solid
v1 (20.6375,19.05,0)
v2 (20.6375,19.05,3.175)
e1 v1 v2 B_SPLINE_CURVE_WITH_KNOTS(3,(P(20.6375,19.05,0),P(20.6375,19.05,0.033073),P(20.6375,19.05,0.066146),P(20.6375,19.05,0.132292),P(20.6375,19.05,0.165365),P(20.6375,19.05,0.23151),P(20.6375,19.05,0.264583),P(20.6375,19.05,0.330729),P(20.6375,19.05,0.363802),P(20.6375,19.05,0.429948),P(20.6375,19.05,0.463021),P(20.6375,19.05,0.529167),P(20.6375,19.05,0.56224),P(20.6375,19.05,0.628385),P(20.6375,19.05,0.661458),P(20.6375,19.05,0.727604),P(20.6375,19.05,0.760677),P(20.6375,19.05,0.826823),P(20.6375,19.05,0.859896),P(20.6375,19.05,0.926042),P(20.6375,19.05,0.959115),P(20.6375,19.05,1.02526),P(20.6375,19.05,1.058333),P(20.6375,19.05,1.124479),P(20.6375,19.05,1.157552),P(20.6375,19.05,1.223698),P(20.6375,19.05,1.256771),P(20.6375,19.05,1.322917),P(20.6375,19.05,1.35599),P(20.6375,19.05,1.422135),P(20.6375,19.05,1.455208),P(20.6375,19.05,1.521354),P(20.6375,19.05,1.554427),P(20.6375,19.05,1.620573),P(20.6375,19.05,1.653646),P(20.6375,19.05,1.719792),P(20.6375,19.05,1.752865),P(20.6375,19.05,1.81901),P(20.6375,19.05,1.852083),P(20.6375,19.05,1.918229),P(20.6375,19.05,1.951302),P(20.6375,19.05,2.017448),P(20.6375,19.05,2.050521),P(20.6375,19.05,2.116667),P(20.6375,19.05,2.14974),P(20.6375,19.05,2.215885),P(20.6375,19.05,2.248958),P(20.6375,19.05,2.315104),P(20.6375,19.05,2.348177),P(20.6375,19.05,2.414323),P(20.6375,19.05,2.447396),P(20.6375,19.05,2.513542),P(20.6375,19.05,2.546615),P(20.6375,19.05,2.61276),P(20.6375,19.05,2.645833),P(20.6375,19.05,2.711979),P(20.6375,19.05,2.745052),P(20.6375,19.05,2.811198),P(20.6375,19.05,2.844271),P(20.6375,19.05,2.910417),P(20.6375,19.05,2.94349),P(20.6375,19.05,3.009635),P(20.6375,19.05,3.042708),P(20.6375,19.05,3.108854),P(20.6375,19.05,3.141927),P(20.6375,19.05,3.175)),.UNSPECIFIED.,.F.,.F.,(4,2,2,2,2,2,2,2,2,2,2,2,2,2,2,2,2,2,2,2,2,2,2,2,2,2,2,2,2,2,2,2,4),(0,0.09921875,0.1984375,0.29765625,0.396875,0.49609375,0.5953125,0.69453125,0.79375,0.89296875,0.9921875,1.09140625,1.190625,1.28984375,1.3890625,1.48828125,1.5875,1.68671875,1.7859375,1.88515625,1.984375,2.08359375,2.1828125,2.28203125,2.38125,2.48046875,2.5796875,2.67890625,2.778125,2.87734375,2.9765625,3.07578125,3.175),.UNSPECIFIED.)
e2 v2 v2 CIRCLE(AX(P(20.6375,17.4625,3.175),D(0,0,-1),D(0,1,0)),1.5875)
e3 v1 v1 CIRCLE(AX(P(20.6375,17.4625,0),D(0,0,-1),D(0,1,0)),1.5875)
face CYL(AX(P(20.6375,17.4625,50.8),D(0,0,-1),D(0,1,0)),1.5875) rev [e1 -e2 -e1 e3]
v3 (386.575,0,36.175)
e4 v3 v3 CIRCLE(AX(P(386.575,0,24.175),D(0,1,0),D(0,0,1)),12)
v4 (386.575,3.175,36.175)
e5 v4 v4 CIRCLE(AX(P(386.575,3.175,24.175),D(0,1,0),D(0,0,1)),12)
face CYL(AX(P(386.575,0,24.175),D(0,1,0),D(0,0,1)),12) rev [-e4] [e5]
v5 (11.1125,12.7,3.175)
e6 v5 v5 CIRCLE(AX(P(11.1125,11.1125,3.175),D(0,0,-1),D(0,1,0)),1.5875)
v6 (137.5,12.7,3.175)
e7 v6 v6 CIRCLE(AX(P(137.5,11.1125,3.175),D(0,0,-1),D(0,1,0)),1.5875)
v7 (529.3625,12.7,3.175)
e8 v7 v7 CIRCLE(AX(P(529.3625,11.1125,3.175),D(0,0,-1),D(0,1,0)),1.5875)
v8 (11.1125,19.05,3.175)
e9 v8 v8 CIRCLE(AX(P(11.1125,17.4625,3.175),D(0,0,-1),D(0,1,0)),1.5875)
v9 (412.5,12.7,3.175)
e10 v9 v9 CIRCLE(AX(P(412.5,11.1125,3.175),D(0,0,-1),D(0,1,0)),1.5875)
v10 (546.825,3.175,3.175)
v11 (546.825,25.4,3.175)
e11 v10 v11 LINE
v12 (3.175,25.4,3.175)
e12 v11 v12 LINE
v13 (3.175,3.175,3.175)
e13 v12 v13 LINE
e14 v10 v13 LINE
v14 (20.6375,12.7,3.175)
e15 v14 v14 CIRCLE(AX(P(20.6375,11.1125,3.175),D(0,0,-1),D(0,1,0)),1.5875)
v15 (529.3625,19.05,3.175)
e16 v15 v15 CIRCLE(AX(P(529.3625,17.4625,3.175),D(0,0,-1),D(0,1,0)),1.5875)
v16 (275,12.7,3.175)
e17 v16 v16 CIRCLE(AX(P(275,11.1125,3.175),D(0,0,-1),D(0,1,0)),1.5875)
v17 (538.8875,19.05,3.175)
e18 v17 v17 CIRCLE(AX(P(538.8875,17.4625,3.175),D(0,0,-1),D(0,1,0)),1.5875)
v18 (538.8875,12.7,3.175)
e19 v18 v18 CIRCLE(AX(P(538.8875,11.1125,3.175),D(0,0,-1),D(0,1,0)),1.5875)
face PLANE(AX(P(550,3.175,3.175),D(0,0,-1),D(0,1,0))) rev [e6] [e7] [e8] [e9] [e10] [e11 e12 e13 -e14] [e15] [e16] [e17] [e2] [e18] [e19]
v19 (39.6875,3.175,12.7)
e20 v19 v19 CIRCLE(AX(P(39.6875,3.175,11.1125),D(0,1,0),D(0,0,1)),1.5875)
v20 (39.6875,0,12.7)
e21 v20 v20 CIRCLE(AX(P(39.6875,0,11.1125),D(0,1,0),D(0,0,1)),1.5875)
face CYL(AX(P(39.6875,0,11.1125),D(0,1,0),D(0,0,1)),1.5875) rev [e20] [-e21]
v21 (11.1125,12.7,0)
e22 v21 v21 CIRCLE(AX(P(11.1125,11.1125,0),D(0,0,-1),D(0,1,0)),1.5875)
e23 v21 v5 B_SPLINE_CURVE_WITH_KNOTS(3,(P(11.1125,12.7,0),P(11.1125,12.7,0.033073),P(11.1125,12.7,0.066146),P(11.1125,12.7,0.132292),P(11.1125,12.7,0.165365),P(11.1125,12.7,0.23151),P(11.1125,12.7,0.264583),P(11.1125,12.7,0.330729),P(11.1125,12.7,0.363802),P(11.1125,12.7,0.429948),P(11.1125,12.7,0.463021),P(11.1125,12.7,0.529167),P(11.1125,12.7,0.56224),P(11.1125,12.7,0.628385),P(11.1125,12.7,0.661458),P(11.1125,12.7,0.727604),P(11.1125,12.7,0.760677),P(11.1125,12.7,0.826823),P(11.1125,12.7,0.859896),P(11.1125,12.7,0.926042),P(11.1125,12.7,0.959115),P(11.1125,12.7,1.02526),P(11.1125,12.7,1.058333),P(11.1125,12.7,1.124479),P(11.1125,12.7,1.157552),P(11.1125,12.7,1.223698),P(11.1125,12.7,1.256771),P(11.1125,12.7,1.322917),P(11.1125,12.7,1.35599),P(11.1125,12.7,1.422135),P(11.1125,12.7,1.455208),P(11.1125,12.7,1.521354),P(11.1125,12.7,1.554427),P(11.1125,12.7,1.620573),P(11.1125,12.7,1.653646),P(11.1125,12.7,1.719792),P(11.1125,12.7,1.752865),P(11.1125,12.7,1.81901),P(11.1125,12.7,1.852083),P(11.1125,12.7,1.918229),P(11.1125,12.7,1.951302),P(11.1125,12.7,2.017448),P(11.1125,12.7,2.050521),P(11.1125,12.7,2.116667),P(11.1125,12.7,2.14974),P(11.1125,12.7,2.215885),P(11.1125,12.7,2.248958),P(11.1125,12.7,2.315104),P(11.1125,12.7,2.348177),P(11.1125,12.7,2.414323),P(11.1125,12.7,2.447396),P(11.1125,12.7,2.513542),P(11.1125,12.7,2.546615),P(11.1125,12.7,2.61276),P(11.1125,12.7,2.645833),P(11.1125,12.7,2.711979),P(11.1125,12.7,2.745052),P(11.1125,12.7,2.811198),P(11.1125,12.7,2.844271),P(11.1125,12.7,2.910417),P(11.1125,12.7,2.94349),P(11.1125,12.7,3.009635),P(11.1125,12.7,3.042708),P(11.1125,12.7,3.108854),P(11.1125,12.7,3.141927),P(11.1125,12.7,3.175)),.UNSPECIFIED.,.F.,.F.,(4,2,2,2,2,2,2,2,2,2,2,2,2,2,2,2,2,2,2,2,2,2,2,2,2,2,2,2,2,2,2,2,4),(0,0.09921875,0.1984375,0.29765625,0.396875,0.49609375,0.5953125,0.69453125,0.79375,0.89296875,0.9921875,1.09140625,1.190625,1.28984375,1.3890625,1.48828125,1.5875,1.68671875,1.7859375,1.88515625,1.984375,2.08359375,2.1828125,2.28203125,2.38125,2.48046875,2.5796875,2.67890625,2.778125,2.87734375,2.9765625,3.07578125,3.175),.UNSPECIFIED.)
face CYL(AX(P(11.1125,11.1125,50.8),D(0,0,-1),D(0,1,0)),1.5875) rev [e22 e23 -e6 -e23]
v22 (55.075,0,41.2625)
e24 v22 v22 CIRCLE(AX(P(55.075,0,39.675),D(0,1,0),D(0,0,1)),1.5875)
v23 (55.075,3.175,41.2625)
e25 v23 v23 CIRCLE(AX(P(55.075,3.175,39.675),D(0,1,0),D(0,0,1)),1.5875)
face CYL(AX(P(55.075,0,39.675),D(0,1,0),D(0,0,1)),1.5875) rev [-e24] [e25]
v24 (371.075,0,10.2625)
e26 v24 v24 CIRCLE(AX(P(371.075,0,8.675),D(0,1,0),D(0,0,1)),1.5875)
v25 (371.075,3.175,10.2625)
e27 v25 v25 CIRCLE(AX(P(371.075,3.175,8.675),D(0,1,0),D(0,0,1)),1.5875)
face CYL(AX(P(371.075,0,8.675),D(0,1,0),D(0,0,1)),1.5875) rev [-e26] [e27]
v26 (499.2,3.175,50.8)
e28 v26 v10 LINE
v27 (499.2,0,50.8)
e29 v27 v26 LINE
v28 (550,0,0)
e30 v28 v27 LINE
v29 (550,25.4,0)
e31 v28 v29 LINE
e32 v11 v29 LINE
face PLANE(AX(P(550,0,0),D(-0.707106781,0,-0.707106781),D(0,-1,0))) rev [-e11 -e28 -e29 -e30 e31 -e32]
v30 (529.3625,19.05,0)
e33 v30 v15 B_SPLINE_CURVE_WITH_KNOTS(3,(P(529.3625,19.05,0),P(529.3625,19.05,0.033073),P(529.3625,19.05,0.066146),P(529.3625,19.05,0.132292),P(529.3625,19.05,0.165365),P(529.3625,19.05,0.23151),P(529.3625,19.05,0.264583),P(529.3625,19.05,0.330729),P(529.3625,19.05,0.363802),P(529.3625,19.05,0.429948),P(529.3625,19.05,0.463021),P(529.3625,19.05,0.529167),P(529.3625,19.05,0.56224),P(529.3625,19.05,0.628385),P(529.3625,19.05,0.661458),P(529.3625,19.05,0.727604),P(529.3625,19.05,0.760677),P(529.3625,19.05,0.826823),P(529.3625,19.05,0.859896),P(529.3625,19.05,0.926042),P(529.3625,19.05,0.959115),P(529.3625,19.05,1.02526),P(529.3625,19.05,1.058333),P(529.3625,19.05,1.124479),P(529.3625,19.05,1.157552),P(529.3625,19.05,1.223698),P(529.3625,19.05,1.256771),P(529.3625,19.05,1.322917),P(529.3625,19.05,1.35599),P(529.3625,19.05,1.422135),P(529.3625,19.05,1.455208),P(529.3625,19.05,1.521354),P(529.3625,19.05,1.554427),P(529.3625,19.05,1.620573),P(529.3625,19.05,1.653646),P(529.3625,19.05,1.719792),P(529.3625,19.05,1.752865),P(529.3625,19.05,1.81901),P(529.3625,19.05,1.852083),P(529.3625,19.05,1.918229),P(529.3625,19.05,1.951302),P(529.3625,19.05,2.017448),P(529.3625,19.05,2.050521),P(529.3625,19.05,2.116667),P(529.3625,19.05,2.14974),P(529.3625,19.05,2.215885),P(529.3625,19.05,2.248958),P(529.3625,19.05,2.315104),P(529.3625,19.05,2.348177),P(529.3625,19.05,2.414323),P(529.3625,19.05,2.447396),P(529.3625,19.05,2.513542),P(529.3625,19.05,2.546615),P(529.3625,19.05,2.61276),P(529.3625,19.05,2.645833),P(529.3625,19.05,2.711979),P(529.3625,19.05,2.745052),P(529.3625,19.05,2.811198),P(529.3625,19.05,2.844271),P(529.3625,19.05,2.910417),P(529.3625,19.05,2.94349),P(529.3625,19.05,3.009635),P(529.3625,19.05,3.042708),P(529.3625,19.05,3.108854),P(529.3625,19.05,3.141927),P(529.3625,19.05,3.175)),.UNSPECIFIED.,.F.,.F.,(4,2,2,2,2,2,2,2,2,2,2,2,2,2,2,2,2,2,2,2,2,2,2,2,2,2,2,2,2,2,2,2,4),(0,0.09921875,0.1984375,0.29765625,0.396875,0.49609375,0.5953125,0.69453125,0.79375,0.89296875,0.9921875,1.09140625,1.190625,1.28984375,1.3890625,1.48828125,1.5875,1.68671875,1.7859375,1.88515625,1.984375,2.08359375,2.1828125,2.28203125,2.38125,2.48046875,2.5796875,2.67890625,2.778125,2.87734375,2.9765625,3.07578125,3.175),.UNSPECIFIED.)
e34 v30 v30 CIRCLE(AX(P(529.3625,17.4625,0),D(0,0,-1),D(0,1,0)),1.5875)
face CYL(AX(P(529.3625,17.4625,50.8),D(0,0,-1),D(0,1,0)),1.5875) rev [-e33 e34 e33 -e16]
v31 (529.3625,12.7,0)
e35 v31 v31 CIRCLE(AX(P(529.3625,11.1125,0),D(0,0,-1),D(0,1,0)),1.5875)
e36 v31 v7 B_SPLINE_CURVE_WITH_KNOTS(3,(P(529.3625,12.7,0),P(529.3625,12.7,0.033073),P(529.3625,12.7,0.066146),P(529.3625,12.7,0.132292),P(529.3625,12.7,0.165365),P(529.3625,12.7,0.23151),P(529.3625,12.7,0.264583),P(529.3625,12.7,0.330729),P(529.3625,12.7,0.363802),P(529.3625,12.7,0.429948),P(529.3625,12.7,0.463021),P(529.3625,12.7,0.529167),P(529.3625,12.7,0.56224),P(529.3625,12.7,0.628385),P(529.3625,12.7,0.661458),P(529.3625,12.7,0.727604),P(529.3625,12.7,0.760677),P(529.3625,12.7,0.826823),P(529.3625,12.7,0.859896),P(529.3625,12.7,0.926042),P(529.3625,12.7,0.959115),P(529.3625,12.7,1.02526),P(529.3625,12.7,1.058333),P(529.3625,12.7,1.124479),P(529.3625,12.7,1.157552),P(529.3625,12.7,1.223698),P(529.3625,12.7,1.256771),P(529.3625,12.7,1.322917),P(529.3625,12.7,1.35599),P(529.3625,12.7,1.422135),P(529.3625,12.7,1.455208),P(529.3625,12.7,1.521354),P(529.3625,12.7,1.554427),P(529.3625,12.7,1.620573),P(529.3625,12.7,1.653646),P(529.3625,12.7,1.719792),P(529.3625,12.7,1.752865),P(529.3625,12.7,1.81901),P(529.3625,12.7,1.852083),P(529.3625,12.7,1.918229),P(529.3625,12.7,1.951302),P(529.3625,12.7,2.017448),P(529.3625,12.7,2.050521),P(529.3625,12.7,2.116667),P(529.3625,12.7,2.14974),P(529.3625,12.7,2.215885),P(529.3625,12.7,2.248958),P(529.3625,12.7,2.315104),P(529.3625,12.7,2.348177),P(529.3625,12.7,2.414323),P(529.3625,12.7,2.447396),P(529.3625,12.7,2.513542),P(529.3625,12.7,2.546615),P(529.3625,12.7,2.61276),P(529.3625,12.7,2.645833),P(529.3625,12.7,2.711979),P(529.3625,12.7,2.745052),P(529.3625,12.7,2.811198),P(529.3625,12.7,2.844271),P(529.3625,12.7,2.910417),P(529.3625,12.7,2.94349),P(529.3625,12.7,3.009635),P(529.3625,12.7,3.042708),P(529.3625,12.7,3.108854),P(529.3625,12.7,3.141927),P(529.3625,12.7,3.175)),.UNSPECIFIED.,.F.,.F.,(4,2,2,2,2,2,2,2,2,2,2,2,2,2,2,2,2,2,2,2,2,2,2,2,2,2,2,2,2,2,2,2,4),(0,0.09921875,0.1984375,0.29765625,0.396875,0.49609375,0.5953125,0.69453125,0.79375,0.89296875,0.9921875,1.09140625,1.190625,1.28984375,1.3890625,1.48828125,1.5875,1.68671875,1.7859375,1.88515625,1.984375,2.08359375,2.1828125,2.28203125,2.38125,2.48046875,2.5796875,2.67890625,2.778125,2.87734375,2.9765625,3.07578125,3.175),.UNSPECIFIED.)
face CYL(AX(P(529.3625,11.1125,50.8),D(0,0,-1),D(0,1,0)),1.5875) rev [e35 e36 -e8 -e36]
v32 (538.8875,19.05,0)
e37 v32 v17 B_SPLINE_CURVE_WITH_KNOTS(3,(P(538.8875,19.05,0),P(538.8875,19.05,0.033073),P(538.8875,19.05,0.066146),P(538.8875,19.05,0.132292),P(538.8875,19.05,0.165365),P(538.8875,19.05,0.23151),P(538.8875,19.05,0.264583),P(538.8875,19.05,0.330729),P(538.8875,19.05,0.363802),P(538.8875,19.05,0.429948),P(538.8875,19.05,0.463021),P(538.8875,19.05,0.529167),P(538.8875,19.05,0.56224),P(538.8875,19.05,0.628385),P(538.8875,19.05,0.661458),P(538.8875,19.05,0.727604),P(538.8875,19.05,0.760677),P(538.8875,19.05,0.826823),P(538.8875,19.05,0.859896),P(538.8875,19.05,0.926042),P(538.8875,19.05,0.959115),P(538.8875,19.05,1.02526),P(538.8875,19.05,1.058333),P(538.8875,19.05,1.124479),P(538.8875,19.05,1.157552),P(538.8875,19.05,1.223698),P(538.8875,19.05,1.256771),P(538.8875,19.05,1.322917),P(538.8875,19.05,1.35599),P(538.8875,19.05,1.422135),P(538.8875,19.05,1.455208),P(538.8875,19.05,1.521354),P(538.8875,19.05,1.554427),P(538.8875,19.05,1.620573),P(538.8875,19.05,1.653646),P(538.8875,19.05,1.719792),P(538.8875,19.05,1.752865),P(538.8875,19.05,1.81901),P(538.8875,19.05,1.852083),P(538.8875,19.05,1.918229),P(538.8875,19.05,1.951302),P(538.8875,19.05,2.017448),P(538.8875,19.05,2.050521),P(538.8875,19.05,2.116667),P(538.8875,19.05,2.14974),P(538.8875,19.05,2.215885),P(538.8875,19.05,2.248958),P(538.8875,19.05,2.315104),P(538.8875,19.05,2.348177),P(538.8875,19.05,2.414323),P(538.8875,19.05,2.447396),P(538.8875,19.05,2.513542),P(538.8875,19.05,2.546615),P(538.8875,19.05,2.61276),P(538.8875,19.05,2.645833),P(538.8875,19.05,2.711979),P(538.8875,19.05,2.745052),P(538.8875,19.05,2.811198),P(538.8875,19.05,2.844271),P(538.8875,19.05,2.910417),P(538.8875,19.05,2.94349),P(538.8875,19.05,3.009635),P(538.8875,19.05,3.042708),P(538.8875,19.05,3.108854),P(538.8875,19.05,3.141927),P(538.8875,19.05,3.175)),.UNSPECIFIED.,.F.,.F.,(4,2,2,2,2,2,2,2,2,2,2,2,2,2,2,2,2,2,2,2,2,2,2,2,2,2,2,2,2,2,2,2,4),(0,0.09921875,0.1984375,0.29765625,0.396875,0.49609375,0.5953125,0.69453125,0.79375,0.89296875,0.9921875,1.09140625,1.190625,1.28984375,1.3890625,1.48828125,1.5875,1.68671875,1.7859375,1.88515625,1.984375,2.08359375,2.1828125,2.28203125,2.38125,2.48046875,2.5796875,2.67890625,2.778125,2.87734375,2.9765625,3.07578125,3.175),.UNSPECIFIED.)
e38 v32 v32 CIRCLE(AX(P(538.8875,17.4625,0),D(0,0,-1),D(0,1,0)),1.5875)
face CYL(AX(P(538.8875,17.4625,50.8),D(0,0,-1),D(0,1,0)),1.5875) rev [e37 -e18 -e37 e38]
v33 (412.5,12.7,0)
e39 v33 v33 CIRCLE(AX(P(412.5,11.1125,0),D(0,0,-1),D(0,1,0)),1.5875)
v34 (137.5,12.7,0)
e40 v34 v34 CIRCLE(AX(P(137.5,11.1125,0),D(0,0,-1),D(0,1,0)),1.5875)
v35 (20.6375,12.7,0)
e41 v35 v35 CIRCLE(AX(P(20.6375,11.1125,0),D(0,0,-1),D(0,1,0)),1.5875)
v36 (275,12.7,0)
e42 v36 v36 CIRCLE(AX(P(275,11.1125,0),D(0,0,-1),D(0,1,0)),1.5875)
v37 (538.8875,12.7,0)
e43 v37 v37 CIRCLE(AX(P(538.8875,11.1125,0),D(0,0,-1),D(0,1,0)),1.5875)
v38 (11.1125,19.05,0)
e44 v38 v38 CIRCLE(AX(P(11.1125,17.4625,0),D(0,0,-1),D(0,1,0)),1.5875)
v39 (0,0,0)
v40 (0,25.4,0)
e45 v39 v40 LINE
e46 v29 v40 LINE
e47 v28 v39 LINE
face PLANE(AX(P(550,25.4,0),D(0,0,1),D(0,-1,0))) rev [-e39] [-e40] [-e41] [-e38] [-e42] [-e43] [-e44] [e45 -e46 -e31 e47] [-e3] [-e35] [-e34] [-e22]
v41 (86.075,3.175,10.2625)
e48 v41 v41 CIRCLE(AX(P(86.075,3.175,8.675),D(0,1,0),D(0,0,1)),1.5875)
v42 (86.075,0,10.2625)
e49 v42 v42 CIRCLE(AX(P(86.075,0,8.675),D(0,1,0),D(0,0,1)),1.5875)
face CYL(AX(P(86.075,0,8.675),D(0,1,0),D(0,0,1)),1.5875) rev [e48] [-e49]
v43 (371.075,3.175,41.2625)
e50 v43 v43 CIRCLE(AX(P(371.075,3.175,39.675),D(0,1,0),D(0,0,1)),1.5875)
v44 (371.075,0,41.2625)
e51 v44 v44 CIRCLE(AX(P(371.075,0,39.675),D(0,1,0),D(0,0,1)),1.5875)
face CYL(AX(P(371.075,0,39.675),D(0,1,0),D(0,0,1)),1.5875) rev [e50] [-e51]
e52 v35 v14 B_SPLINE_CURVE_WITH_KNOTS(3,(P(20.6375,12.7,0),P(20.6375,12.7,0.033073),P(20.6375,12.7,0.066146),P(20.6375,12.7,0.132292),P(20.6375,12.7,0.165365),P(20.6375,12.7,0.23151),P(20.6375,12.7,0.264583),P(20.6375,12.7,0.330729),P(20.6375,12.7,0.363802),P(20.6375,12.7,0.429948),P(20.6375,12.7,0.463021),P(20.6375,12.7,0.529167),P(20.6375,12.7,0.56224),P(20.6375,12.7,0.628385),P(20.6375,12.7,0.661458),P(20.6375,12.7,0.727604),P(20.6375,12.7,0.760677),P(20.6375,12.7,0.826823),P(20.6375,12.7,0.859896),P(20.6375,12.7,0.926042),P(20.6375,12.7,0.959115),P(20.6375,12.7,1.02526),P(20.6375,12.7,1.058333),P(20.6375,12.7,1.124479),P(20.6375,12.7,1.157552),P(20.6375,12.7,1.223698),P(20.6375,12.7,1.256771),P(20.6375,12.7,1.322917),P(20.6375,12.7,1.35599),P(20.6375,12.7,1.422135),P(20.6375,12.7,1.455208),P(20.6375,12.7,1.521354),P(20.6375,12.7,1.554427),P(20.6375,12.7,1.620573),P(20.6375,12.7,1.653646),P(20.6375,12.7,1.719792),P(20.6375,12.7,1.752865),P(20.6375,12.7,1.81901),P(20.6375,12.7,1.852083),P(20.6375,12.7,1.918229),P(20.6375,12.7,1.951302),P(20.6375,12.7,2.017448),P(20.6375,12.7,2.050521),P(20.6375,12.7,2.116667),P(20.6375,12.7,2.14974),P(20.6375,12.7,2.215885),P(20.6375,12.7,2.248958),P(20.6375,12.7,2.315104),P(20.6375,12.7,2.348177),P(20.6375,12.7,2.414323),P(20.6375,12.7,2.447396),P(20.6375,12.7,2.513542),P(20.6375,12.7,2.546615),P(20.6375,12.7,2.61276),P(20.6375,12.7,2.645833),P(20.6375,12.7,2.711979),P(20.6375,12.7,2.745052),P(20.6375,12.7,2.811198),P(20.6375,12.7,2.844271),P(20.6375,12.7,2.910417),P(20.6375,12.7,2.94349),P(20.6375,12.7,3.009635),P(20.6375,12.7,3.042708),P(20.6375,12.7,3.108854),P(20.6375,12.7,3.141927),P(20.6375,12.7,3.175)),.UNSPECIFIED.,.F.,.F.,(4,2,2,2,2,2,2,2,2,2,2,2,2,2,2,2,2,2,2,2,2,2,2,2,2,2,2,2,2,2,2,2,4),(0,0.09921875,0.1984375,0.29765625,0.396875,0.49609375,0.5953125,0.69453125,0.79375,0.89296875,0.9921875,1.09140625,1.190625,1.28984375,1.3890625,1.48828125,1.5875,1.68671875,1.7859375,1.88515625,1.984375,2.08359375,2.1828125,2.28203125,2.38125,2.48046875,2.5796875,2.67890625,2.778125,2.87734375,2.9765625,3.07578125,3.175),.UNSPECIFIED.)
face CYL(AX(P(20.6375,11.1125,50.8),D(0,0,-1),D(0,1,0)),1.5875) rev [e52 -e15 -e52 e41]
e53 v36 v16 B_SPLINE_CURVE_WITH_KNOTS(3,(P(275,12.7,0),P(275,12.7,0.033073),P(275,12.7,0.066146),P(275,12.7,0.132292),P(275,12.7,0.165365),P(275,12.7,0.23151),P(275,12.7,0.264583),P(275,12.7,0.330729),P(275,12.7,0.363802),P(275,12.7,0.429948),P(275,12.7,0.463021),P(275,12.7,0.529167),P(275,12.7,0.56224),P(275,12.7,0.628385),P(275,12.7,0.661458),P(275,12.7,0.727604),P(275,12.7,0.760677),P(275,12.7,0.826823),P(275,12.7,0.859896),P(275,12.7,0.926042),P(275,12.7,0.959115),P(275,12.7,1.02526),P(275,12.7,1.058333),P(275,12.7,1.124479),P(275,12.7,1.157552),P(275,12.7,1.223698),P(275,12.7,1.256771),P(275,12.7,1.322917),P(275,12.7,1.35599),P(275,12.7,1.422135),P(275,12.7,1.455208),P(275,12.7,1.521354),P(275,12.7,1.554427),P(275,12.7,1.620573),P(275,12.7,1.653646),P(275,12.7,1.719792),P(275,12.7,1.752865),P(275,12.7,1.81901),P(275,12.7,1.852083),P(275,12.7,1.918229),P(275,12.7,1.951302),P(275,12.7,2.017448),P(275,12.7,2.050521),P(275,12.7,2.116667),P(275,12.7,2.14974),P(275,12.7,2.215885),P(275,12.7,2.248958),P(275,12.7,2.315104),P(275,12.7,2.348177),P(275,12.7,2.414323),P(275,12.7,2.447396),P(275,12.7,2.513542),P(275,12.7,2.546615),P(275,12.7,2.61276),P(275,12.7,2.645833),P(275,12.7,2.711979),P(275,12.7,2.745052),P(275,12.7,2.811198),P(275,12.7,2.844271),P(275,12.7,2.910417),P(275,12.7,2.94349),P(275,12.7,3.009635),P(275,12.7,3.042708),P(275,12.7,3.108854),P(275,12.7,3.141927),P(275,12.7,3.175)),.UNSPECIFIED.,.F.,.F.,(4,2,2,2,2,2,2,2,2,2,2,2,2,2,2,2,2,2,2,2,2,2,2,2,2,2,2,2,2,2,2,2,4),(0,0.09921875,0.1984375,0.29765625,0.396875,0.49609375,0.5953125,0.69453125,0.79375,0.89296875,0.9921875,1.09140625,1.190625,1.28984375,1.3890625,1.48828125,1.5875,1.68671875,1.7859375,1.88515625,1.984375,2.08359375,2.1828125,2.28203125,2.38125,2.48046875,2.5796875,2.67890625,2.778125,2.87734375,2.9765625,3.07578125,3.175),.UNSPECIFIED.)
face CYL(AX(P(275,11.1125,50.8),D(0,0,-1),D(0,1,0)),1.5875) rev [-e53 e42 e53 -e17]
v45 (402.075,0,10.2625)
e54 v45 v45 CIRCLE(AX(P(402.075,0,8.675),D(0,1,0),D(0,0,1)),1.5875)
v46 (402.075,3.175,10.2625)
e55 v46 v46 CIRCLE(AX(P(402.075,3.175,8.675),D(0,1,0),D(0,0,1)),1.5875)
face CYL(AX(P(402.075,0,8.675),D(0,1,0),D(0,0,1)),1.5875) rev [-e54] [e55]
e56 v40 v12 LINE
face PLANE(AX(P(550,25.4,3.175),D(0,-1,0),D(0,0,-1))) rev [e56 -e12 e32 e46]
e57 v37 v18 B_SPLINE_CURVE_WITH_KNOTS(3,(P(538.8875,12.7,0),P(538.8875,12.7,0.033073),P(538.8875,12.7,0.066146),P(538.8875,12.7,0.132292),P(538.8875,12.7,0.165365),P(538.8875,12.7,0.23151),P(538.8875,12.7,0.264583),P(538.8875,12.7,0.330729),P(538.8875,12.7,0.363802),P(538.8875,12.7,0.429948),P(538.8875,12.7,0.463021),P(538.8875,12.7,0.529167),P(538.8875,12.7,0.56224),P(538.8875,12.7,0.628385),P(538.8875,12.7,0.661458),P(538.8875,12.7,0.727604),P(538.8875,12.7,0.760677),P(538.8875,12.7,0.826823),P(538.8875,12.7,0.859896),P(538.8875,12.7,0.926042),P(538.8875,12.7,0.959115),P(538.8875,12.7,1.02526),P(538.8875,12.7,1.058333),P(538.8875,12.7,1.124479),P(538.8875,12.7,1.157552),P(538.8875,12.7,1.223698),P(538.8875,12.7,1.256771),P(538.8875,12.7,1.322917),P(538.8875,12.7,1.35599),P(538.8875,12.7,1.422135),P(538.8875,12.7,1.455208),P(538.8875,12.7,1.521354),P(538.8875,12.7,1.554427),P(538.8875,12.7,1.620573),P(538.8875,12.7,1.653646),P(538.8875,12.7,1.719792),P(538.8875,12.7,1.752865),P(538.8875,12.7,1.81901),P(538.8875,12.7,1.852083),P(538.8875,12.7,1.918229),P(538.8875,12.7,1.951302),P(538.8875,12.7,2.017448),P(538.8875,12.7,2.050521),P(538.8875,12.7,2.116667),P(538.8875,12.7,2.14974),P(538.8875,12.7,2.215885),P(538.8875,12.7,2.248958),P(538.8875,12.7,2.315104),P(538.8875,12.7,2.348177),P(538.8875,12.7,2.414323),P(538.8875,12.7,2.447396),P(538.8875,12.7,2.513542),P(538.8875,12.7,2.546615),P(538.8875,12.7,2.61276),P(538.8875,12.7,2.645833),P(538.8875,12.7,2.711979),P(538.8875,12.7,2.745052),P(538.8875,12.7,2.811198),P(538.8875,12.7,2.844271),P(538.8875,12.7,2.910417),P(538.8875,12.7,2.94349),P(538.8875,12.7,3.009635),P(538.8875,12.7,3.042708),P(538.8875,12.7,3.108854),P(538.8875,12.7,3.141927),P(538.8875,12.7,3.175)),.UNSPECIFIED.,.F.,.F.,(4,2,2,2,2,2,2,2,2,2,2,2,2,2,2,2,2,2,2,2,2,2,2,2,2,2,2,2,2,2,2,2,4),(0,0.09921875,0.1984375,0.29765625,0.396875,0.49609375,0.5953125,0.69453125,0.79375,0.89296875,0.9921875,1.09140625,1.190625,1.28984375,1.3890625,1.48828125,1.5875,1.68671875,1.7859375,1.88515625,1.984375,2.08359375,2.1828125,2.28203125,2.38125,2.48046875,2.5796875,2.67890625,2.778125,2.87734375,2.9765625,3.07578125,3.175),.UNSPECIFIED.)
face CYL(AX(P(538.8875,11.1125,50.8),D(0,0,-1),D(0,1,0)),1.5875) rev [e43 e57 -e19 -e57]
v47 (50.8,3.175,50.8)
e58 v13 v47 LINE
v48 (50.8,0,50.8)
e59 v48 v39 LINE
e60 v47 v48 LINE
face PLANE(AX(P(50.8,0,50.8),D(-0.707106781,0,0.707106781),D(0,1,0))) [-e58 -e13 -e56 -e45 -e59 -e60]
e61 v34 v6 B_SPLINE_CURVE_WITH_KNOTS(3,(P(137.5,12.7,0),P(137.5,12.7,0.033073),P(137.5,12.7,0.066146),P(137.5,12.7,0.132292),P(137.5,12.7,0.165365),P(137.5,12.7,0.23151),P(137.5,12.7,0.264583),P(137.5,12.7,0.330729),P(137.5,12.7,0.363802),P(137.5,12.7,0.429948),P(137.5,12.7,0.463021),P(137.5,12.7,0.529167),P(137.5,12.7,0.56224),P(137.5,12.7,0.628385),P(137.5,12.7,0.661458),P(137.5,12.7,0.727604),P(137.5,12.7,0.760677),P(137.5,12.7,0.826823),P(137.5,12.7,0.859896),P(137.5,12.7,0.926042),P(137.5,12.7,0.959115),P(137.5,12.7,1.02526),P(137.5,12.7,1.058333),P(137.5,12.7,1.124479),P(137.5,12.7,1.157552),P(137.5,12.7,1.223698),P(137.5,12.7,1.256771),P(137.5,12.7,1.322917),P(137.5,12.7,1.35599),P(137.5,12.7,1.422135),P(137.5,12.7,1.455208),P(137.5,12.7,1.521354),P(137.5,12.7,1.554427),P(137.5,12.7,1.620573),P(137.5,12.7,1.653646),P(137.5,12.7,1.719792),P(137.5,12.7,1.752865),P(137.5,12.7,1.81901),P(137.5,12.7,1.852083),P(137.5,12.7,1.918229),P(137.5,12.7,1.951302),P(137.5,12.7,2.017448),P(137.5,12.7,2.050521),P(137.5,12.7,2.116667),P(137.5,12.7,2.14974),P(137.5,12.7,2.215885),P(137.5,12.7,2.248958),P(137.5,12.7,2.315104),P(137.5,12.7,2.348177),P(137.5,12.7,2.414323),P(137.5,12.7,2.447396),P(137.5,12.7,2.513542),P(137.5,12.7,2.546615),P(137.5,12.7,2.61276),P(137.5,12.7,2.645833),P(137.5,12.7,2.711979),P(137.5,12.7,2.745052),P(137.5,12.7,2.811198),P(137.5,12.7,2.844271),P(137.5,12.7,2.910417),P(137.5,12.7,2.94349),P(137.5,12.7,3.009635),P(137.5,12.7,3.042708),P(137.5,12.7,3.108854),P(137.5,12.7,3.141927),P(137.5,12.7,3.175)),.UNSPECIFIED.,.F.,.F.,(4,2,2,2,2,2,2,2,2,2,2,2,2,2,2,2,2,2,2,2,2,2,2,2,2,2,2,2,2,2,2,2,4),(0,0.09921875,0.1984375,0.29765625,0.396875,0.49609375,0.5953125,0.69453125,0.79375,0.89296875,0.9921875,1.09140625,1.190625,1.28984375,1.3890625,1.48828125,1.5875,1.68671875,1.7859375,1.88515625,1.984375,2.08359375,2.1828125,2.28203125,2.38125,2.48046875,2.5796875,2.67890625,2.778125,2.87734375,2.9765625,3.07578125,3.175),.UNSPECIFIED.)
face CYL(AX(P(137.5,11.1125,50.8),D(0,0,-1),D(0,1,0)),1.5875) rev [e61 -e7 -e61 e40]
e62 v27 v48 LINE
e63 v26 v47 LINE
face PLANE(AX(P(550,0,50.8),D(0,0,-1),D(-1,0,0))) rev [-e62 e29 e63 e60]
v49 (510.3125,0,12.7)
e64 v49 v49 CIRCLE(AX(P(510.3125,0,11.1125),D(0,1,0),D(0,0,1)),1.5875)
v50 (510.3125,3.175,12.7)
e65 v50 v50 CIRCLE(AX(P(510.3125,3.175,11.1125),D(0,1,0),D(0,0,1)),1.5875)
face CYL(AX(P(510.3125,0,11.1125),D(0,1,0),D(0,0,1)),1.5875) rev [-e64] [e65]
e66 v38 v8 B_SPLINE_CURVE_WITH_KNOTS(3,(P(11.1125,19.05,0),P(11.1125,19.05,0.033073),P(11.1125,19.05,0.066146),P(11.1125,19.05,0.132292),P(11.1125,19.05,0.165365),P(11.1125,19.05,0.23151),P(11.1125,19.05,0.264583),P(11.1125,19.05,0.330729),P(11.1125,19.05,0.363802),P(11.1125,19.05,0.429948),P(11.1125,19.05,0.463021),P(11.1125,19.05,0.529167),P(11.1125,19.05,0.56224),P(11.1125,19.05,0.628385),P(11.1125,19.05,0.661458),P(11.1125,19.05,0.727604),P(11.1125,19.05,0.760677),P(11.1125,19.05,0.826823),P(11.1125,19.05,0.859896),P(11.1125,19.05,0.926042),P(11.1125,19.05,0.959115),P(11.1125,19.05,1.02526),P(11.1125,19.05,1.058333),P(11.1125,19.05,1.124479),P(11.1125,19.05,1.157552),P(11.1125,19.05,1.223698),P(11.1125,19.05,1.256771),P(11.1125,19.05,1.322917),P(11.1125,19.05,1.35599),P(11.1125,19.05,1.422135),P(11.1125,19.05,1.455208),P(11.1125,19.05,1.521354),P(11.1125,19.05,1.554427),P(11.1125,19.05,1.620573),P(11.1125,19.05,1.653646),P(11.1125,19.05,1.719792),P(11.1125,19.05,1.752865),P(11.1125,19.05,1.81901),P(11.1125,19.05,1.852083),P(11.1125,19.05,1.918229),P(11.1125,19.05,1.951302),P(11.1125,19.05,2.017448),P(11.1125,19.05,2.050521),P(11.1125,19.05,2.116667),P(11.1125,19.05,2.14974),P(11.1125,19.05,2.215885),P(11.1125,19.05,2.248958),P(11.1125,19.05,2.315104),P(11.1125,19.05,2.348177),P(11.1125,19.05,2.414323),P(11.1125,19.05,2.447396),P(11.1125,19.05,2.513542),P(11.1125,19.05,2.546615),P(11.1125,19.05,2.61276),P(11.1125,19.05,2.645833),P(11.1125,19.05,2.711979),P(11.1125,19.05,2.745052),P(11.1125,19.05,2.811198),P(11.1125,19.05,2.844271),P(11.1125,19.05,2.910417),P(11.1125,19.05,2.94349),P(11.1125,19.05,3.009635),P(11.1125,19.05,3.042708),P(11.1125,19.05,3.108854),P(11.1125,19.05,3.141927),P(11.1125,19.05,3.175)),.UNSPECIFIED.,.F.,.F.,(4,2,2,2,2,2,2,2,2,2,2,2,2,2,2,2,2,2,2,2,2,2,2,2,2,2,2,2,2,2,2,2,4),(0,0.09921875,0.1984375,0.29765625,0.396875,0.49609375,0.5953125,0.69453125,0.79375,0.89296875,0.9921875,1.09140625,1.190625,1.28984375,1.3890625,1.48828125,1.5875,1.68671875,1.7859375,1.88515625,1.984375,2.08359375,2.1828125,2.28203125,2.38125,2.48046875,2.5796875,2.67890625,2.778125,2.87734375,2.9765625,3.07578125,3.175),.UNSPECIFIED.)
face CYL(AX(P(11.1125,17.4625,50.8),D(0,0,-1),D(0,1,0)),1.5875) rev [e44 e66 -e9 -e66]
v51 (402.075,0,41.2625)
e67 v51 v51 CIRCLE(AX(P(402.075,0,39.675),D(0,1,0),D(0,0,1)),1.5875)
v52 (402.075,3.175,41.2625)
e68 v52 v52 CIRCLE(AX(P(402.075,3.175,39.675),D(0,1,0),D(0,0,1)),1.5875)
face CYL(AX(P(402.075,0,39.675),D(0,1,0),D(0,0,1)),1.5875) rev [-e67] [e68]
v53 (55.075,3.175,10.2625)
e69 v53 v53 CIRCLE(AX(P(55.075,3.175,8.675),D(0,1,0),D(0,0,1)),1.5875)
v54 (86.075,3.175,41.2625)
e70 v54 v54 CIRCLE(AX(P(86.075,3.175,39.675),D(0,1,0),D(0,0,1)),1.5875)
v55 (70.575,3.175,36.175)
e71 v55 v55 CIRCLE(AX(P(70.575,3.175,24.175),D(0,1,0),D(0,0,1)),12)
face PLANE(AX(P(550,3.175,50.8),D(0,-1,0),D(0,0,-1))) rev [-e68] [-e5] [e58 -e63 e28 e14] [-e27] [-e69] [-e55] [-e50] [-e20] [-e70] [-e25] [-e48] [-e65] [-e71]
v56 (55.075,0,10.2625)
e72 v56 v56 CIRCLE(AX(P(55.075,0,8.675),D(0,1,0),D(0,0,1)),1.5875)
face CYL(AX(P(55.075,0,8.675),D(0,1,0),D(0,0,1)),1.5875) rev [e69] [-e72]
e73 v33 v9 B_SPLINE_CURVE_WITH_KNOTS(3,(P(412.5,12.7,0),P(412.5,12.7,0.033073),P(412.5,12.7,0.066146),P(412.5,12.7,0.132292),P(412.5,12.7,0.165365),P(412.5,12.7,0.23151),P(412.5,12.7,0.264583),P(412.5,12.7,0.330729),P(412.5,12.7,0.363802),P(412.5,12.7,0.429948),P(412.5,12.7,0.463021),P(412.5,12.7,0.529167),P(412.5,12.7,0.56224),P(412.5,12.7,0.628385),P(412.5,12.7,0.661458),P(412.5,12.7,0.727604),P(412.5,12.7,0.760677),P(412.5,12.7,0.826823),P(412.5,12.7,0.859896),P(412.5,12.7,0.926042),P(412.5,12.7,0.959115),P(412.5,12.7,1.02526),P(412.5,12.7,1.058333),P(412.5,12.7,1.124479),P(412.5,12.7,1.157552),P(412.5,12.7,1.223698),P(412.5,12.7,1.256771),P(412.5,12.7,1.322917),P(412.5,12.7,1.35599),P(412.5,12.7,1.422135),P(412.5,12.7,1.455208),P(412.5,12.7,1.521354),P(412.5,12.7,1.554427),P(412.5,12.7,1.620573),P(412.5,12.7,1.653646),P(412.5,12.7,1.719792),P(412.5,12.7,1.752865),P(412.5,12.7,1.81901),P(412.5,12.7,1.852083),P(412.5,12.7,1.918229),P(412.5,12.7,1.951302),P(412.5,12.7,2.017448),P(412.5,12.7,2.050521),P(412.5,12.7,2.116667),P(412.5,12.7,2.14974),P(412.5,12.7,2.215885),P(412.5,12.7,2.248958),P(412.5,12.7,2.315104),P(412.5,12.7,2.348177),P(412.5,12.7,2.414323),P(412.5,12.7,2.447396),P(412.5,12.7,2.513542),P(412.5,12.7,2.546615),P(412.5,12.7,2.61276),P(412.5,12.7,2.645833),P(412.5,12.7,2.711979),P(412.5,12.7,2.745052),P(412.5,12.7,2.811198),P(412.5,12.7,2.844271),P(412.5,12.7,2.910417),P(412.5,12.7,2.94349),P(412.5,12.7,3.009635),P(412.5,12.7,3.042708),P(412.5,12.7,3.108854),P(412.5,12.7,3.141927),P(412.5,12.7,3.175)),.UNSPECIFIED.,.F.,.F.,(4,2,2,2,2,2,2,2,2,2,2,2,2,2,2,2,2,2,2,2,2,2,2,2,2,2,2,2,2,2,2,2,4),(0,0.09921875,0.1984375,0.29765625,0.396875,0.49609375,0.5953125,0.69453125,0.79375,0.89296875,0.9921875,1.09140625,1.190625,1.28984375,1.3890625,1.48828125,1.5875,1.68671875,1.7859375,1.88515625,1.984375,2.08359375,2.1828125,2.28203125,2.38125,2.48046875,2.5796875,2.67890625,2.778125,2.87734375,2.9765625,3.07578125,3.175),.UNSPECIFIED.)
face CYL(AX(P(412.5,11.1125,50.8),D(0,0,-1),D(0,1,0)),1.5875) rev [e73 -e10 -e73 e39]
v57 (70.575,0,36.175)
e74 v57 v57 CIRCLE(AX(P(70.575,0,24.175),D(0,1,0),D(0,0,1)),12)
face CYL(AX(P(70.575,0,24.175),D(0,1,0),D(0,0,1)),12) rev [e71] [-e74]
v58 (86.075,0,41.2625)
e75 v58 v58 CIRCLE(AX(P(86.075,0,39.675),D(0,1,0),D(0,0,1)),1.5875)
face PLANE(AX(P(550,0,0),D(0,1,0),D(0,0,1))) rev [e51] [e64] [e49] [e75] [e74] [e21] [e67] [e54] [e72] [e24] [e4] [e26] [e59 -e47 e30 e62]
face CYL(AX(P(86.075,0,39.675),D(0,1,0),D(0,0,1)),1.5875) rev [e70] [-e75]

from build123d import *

# Parameters (mm, degrees)
BOSS_EXTRUDE1_DEPTH              = 550
CHAMFER7_SIZE                    = 50.8
CHAMFER8_SIZE                    = 50.8
BOTTHOMHOLES_SKETCH2_R           = 12
BOTTHOMHOLES_SKETCH2_R_2         = 1.5875
BOTTOMHOLES_CUT_EXTRUDE1_DEPTH   = 553.788015993
LEFTSIDEHOLES_SKETCH3_R          = 1.5875
LEFTSIDEHOLES_CUT_EXTRUDE2_DEPTH = 553.924768843


with BuildPart() as part:
    # Sketch1 → Boss-Extrude1 (new body)
    with BuildSketch(Plane(origin=(0, 0, 0), x_dir=(0, 0, -1), z_dir=(1, 0, 0))):
        Polygon((0, 0), (-50.8, 0), (-50.8, 3.175), (-3.175, 3.175), (-3.175, 25.4), (0, 25.4), align=None)
    extrude(amount=BOSS_EXTRUDE1_DEPTH)

    # Chamfer7
    chamfer7_edges = [part.edges().sort_by_distance(p)[0] for p in [
        (0, 1.5875, 50.8),
    ]]
    chamfer(chamfer7_edges, length=CHAMFER7_SIZE - 0.0001)  # a hair under: the kernel refuses the full size

    # Chamfer8
    chamfer8_edges = [part.edges().sort_by_distance(p)[0] for p in [
        (550, 1.5875, 50.8),
    ]]
    chamfer(chamfer8_edges, length=CHAMFER8_SIZE - 0.0001)  # a hair under: the kernel refuses the full size

    # BotthomHoles-Sketch2 → BottomHoles-Cut-Extrude1 (cut, through all)
    with BuildSketch(Plane(origin=(0, 3.175, 0), x_dir=(1, 0, 0), z_dir=(0, 1, 0))):
        with Locations(Location((70.575, -24.175, 0), (0, 0, 270))):
            Circle(BOTTHOMHOLES_SKETCH2_R)
        with Locations(Location((386.575, -24.175, 0), (0, 0, 270))):
            Circle(BOTTHOMHOLES_SKETCH2_R)
        with Locations(Location((55.075, -8.675, 0), (0, 0, 270))):
            Circle(BOTTHOMHOLES_SKETCH2_R_2)
        with Locations(Location((86.075, -8.675, 0), (0, 0, 270))):
            Circle(BOTTHOMHOLES_SKETCH2_R_2)
        with Locations(Location((371.075, -8.675, 0), (0, 0, 270))):
            Circle(BOTTHOMHOLES_SKETCH2_R_2)
        with Locations(Location((402.075, -8.675, 0), (0, 0, 270))):
            Circle(BOTTHOMHOLES_SKETCH2_R_2)
        with Locations(Location((55.075, -39.675, 0), (0, 0, 270))):
            Circle(BOTTHOMHOLES_SKETCH2_R_2)
        with Locations(Location((86.075, -39.675, 0), (0, 0, 270))):
            Circle(BOTTHOMHOLES_SKETCH2_R_2)
        with Locations(Location((371.075, -39.675, 0), (0, 0, 270))):
            Circle(BOTTHOMHOLES_SKETCH2_R_2)
        with Locations(Location((402.075, -39.675, 0), (0, 0, 270))):
            Circle(BOTTHOMHOLES_SKETCH2_R_2)
        with Locations(Location((39.6875, -11.1125, 0), (0, 0, 270))):
            Circle(BOTTHOMHOLES_SKETCH2_R_2)
        with Locations(Location((510.3125, -11.1125, 0), (0, 0, 270))):
            Circle(BOTTHOMHOLES_SKETCH2_R_2)
    extrude(amount=-BOTTOMHOLES_CUT_EXTRUDE1_DEPTH, mode=Mode.SUBTRACT)

    # LeftSideHoles-Sketch3 → LeftSideHoles-Cut-Extrude2 (cut, through all)
    with BuildSketch(Plane(origin=(0, 0, 0), x_dir=(-1, 0, 0), z_dir=(0, 0, -1))):
        with Locations(Location((-538.8875, 17.4625, 0), (0, 0, 90))):
            Circle(LEFTSIDEHOLES_SKETCH3_R)
        with Locations(Location((-529.3625, 17.4625, 0), (0, 0, 90))):
            Circle(LEFTSIDEHOLES_SKETCH3_R)
        with Locations(Location((-538.8875, 11.1125, 0), (0, 0, 90))):
            Circle(LEFTSIDEHOLES_SKETCH3_R)
        with Locations(Location((-529.3625, 11.1125, 0), (0, 0, 90))):
            Circle(LEFTSIDEHOLES_SKETCH3_R)
        with Locations(Location((-11.1125, 11.1125, 0), (0, 0, 90))):
            Circle(LEFTSIDEHOLES_SKETCH3_R)
        with Locations(Location((-20.6375, 11.1125, 0), (0, 0, 90))):
            Circle(LEFTSIDEHOLES_SKETCH3_R)
        with Locations(Location((-20.6375, 17.4625, 0), (0, 0, 90))):
            Circle(LEFTSIDEHOLES_SKETCH3_R)
        with Locations(Location((-11.1125, 17.4625, 0), (0, 0, 90))):
            Circle(LEFTSIDEHOLES_SKETCH3_R)
        with Locations(Location((-412.5, 11.1125, 0), (0, 0, 90))):
            Circle(LEFTSIDEHOLES_SKETCH3_R)
        with Locations(Location((-275, 11.1125, 0), (0, 0, 90))):
            Circle(LEFTSIDEHOLES_SKETCH3_R)
        with Locations(Location((-137.5, 11.1125, 0), (0, 0, 90))):
            Circle(LEFTSIDEHOLES_SKETCH3_R)
    extrude(amount=-LEFTSIDEHOLES_CUT_EXTRUDE2_DEPTH, mode=Mode.SUBTRACT)


solid = part.part
